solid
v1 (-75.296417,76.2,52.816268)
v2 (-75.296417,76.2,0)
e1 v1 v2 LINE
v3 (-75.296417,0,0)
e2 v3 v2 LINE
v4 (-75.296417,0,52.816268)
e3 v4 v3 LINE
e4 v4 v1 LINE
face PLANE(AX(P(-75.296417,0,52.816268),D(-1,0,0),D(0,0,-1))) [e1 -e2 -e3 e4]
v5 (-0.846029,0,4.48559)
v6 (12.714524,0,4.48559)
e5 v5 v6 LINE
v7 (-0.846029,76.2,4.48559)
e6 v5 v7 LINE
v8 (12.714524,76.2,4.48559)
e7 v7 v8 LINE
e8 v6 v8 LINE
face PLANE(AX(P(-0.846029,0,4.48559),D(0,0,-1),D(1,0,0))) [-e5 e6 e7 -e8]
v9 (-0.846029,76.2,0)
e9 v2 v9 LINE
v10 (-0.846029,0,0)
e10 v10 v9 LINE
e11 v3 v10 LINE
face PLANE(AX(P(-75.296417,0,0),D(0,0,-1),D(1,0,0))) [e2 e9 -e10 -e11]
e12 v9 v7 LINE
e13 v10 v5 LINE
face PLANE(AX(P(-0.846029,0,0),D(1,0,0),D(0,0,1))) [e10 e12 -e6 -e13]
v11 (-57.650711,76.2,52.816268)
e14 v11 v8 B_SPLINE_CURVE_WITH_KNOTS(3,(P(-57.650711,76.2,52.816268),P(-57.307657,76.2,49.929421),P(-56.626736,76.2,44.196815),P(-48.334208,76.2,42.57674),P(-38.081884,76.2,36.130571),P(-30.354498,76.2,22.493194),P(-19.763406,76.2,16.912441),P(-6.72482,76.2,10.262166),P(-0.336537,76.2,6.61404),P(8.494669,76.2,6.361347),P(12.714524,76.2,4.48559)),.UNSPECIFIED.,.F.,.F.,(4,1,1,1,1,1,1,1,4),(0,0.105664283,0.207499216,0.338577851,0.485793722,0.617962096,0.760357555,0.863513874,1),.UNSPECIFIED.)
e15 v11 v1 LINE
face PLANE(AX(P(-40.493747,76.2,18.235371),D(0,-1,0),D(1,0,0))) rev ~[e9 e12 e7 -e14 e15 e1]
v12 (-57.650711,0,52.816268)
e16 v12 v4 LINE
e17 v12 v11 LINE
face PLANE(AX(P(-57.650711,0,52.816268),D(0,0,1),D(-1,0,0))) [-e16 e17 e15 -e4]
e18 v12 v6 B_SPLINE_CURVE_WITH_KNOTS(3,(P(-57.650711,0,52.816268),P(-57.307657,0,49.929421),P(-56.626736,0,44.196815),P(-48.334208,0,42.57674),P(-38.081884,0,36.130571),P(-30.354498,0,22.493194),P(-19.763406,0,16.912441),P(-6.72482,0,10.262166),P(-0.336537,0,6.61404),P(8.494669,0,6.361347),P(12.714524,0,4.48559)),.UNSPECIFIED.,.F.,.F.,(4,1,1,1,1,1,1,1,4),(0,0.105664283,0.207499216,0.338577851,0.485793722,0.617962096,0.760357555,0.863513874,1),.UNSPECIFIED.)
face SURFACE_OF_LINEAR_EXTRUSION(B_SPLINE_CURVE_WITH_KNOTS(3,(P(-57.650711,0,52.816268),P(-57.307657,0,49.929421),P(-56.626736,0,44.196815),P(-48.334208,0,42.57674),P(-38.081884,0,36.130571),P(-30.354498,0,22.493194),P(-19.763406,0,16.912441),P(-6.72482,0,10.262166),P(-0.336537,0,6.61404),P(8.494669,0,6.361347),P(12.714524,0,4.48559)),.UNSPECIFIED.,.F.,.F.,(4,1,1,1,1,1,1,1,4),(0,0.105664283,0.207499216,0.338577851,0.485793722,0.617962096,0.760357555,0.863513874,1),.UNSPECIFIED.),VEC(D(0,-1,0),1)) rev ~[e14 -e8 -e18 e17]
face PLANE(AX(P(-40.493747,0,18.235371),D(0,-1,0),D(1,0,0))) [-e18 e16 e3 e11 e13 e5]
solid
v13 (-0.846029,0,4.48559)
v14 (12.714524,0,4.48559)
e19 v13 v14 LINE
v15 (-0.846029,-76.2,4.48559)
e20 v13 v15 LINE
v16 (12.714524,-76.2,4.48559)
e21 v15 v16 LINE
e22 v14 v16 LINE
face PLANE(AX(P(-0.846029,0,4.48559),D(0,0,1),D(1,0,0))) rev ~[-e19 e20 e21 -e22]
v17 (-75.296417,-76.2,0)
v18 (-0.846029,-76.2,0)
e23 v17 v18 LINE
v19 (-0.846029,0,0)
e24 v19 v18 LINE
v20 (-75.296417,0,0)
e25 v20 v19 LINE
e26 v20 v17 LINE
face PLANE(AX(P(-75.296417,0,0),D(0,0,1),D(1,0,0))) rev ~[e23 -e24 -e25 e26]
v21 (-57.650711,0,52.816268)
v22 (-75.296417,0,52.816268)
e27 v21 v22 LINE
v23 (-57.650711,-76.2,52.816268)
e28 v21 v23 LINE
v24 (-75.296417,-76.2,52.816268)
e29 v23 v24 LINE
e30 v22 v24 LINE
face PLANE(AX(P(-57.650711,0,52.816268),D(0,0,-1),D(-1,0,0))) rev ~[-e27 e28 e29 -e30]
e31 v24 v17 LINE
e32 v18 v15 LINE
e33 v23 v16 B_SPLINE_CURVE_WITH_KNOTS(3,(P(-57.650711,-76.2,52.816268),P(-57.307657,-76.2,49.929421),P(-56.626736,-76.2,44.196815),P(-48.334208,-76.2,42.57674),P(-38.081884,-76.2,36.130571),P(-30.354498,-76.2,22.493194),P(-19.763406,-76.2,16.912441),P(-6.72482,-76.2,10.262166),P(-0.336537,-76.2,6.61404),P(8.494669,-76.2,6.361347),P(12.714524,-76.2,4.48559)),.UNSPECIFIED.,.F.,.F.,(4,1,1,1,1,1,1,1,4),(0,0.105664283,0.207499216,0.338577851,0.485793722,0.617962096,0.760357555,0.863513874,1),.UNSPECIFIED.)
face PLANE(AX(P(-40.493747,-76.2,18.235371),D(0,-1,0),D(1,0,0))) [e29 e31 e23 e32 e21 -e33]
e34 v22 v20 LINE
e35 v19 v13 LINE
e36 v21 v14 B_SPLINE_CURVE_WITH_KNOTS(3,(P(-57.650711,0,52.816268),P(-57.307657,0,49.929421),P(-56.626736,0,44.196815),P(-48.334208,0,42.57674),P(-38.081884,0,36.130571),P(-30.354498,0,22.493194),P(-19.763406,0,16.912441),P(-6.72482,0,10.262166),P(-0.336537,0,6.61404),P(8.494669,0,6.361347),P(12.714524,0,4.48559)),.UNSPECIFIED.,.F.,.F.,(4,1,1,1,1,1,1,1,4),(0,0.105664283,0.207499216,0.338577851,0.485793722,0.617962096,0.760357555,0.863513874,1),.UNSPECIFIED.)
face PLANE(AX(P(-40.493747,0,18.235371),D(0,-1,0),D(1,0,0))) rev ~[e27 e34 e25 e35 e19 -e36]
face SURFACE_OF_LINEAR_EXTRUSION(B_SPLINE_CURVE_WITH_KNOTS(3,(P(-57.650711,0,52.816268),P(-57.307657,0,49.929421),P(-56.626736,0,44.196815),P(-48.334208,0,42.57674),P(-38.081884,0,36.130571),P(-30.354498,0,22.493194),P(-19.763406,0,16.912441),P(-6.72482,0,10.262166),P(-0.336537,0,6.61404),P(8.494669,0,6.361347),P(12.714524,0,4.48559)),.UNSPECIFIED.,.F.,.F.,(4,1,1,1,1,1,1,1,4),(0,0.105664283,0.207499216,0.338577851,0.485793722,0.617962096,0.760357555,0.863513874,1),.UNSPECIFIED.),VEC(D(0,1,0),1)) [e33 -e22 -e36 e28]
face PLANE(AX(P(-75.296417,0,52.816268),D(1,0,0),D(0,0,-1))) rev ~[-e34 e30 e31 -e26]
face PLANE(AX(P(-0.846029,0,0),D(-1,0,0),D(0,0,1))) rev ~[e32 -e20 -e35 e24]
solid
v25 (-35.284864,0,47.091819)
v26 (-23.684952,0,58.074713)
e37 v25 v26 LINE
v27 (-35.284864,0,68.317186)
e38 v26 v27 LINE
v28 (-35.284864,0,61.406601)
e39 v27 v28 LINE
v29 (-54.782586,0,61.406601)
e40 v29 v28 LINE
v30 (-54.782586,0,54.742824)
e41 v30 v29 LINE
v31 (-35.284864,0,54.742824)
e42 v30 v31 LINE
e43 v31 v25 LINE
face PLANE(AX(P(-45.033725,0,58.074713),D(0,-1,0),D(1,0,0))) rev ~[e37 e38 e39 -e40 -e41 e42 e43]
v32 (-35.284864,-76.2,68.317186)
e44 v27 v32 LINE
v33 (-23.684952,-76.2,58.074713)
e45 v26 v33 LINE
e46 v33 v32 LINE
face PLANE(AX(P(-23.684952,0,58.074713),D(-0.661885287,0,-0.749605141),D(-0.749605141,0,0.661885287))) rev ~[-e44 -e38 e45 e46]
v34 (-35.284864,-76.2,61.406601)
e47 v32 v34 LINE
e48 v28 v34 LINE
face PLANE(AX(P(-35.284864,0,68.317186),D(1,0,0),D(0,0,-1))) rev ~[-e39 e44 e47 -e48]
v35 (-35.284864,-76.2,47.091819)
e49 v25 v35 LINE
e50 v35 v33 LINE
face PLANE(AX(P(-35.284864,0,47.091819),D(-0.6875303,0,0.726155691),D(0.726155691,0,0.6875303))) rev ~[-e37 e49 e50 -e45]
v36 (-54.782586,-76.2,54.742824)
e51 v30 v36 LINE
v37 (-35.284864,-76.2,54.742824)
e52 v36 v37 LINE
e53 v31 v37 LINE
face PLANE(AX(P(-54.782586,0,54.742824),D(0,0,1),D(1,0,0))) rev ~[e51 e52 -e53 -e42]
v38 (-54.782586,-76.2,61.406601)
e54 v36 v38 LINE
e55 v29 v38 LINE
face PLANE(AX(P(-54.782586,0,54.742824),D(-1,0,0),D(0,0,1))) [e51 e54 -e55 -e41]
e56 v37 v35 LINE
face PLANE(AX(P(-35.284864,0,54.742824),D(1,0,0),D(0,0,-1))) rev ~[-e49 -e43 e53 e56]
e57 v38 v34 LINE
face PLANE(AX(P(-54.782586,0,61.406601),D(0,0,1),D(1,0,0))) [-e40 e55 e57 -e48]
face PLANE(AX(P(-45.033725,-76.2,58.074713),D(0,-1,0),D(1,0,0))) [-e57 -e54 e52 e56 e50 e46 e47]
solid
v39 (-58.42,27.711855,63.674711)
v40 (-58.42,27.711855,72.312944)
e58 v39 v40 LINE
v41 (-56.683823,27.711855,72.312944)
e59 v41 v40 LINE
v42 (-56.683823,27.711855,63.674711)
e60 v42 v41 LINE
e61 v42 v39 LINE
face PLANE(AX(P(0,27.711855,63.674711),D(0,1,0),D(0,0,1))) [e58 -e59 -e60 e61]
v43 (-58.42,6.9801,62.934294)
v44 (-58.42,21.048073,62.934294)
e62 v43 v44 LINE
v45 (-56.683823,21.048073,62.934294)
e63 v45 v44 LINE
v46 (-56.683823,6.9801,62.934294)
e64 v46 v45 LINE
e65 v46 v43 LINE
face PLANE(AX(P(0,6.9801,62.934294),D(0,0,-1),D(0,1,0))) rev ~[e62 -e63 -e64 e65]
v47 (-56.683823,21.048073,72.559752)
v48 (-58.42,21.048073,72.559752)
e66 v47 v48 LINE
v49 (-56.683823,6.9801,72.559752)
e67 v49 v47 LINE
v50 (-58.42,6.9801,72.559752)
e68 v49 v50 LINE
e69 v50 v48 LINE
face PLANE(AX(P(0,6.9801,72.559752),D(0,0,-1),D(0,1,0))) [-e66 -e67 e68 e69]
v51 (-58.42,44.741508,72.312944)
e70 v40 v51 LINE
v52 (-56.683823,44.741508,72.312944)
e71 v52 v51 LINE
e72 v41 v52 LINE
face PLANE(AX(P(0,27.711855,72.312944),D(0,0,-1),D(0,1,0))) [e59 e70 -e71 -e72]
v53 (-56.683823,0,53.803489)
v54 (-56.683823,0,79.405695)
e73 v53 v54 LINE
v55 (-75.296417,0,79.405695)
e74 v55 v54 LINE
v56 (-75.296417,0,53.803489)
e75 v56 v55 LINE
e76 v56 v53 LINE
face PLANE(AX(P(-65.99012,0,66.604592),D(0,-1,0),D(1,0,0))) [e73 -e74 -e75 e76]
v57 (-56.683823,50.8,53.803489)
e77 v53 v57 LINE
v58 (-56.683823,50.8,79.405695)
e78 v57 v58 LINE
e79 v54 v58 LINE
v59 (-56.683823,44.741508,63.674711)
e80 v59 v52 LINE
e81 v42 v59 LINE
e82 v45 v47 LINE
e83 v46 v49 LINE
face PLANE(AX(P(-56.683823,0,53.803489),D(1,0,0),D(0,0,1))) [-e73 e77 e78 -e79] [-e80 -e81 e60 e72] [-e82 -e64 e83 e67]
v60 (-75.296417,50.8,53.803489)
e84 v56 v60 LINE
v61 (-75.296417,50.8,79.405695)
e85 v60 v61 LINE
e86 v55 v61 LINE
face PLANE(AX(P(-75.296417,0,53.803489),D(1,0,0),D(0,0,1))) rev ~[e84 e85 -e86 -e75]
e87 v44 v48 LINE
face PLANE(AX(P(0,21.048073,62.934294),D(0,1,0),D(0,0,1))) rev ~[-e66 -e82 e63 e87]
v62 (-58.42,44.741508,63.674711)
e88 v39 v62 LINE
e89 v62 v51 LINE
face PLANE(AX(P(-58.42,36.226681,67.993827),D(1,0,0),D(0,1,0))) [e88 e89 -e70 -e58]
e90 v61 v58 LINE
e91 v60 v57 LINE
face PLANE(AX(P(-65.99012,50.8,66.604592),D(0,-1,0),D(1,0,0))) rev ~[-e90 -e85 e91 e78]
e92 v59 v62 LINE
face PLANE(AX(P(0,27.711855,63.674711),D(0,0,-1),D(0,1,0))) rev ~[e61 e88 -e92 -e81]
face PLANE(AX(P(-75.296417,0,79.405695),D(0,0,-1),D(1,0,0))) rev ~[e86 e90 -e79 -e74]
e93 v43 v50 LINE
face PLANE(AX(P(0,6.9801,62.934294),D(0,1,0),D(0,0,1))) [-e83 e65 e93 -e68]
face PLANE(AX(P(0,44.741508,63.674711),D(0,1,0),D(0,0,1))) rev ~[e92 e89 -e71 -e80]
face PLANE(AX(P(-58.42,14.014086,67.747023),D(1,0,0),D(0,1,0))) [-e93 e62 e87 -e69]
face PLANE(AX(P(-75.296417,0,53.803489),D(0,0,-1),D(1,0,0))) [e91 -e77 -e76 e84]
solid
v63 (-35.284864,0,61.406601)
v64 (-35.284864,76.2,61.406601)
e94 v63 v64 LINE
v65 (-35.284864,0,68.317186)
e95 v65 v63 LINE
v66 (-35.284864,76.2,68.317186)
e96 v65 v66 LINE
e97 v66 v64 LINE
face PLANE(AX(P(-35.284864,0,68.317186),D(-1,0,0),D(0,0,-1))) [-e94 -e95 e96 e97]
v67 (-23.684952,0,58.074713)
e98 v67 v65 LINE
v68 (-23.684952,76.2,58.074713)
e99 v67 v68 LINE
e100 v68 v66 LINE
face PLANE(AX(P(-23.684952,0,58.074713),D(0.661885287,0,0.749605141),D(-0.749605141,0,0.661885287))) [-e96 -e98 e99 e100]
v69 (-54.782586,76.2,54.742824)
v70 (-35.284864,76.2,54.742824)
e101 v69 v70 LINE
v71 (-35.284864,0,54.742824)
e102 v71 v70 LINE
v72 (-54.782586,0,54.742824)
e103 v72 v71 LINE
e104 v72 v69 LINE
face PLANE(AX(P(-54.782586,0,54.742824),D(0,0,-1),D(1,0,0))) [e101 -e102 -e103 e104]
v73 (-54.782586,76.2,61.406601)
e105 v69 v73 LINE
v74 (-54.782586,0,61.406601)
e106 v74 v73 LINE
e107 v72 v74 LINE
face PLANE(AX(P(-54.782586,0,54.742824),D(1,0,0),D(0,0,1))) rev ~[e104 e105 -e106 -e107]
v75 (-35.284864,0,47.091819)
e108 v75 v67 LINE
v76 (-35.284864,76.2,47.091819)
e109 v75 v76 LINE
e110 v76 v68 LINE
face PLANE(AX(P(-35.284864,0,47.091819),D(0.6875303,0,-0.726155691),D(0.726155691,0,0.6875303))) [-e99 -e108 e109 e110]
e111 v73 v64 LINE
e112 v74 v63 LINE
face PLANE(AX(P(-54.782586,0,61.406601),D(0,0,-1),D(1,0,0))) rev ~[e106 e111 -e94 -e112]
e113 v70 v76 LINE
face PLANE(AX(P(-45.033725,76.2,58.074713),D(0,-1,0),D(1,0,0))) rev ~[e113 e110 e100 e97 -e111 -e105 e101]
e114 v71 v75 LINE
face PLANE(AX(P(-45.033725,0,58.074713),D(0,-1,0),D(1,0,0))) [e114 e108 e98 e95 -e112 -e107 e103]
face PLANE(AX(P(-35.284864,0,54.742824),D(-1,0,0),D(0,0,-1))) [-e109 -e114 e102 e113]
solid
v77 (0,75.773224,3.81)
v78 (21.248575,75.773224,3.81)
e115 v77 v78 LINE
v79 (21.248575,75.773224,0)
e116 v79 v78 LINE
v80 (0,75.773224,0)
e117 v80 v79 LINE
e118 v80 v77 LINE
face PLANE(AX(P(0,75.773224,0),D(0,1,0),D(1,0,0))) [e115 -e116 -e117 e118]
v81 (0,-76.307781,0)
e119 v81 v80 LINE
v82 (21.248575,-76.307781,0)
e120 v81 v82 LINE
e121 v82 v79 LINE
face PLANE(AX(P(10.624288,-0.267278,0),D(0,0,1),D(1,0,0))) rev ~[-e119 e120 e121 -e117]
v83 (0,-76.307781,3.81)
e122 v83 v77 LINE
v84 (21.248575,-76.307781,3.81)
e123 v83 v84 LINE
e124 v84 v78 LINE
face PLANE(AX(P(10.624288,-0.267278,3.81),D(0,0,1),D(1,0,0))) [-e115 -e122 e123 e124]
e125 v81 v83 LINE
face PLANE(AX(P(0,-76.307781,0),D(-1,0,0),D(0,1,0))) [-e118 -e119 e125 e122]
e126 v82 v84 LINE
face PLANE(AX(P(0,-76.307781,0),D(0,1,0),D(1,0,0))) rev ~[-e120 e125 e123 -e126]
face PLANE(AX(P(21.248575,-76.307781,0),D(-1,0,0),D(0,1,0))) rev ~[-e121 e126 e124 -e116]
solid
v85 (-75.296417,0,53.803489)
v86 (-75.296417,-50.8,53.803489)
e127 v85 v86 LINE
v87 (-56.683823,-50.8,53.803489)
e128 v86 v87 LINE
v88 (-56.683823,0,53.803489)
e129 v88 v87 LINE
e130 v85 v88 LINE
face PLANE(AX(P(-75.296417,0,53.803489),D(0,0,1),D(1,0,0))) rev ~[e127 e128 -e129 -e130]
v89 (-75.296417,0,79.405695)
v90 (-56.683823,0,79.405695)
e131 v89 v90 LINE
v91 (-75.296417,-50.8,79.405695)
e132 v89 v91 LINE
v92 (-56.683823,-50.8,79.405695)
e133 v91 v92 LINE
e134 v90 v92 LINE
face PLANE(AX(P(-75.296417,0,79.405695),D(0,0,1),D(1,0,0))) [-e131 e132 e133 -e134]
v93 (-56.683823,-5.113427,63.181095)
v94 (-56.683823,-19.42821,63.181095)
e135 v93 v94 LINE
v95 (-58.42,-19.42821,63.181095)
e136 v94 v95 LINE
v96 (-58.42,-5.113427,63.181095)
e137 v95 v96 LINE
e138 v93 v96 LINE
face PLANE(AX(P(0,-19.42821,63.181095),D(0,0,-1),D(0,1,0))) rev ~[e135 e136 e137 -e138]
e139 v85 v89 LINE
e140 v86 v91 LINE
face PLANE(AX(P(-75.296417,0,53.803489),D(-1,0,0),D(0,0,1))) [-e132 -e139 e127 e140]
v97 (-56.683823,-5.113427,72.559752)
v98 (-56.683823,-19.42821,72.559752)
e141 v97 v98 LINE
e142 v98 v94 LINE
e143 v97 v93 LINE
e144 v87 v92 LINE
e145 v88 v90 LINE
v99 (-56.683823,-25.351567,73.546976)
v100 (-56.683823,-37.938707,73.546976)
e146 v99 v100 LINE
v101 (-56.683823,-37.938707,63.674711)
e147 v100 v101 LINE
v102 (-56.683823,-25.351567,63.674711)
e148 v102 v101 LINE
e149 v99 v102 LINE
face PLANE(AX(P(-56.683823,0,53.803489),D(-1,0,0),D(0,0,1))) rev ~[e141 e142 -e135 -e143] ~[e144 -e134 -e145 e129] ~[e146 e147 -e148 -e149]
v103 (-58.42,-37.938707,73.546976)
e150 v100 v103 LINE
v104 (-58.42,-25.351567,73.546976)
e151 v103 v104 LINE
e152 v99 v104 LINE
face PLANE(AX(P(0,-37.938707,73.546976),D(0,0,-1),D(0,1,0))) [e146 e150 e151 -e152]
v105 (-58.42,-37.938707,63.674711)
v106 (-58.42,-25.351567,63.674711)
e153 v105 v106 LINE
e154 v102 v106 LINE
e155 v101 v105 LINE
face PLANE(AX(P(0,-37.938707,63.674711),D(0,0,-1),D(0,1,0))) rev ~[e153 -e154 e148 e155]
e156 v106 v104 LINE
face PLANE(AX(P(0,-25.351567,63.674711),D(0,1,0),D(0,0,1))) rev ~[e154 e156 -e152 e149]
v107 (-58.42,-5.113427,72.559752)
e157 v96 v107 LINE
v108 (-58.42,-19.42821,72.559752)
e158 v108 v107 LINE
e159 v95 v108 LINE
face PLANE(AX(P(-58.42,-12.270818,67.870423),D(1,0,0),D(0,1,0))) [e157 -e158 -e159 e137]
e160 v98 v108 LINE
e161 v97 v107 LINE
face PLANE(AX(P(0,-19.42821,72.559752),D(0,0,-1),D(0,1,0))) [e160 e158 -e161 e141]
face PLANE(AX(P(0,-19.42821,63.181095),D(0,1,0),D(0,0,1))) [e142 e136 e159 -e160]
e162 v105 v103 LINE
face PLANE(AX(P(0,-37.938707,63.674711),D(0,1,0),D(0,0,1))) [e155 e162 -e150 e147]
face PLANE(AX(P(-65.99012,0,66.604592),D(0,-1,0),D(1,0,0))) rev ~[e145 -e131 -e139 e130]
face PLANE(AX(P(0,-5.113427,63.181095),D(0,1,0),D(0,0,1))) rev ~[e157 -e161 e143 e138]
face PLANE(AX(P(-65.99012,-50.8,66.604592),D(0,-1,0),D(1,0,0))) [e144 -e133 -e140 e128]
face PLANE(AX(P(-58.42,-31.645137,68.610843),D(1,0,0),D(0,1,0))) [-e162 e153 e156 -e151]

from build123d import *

# Parameters (mm, degrees)
F0_W     = 21.2485753
F0_H     = 152.0810052752
F1_DEPTH = 3.81
F3_DEPTH = 76.2
F2_W     = 19.4977223873
F2_H     = 6.6637769341
F4_DEPTH = 76.2
F5_W     = 18.6125934124
F5_H     = 25.6022065878
F6_DEPTH = 50.8
F7_DEPTH = 50.8
F8_W     = 14.3147837371
F8_H     = 9.378656745
F8_W_2   = 14.0679730102
F8_H_2   = 9.6254572272
F8_W_3   = 12.587139383
F8_H_3   = 9.8722651601
F8_W_4   = 17.029652372
F8_H_4   = 8.6382329464
F9_DEPTH = 58.42


with BuildPart() as f1:
    # F0 (on Top) → F1 (new body)
    with BuildSketch(Plane.XY):
        with Locations((10.62428765, -0.267278403)):
            Rectangle(F0_W, F0_H)
    extrude(amount=F1_DEPTH)


with BuildPart() as f3:
    # F2 (on Front) → F3 (new body)
    with BuildSketch(Plane.XZ):
        with BuildLine():
            Line((-57.6507113874, 52.8162680566), (-75.2964168787, 52.8162680566))
            Line((-75.2964168787, 52.8162680566), (-75.2964168787, 0))
            Line((-75.2964168787, 0), (-0.846029463, 0))
            Line((-0.846029463, 0), (-0.846029463, 4.4855900342))
            Line((-0.846029463, 4.4855900342), (0, 4.4855900342))
            Line((0, 4.4855900342), (12.7145235892, 4.4855900342))
            add(Edge.make_bspline(
                [(-57.6507113874, 52.8162680566), (-57.3076574479, 49.9294208495), (-56.6267364551, 44.1968150065), (-48.3342084307, 42.576740226), (-38.0818843322, 36.1305714757), (-30.3544979342, 22.4931937459), (-19.7634057619, 16.912441387), (-6.7248199885, 10.2621660981), (-0.3365370443, 6.6140396), (8.4946691957, 6.3613474044), (12.7145235892, 4.4855900342)],
                knots=[0, 0, 0, 0, 0.1056642831, 0.2074992162, 0.338577851, 0.4857937218, 0.6179620961, 0.7603575547, 0.8635138744, 1, 1, 1, 1], degree=3))
        make_face()
    extrude(amount=F3_DEPTH)


with BuildPart() as f3b:
    # F2 (on Front) → F3, piece 2 (new body)
    with BuildSketch(Plane.XZ):
        with Locations((-45.0337249786, 58.0747127533)):
            Rectangle(F2_W, F2_H)
        Polygon((-35.2848637849, 68.3171860874), (-35.2848637849, 61.4066012204), (-35.2848637849, 54.7428242862), (-35.2848637849, 47.091819346), (-23.6849524081, 58.0747127533), align=None)
    extrude(amount=F3_DEPTH)


with BuildPart() as f4:
    # F4 (new): a face of the model
    f4_faces = [f3.part.faces().sort_by_distance(p)[0] for p in [
        (-48.0221712307, 0, 19.9820449464),
    ]]
    extrude(f4_faces, amount=F4_DEPTH)


with BuildPart() as f4b:
    # F4#2 (new): a face of the model
    f4_2_faces = [f3b.part.faces().sort_by_distance(p)[0] for p in [
        (-38.4095254278, 0, 57.954636592),
    ]]
    extrude(f4_2_faces, amount=F4_DEPTH)


with BuildPart() as f6:
    # F5 (on Front) → F6 (new body)
    with BuildSketch(Plane.XZ):
        with Locations((-65.9901201725, 66.6045919061)):
            Rectangle(F5_W, F5_H)
    extrude(amount=F6_DEPTH)


with BuildPart() as f7:
    # F7 (new): a face of the model
    f7_faces = [f6.part.faces().sort_by_distance(p)[0] for p in [
        (-65.9901201725, 0, 66.6045919061),
    ]]
    extrude(f7_faces, amount=F7_DEPTH)


with BuildPart() as f9_tool:
    # F8 (on Right) → F9 (new body)
    with BuildSketch(Plane.YZ):
        with Locations((-12.2708184645, 67.8704231977)):
            Rectangle(F8_W, F8_H)
        with Locations((14.0140862204, 67.7470229566)):
            Rectangle(F8_W_2, F8_H_2)
        with Locations((-31.6451368853, 68.610843271)):
            Rectangle(F8_W_3, F8_H_3)
        with Locations((36.2266814336, 67.9938271642)):
            Rectangle(F8_W_4, F8_H_4)
    extrude(amount=-F9_DEPTH)


with BuildPart() as f6_1:
    add(f6.part)

    # F9: cut by f9_tool
    add(f9_tool.part, mode=Mode.SUBTRACT)


with BuildPart() as f7_1:
    add(f7.part)

    # F9: cut by f9_tool
    add(f9_tool.part, mode=Mode.SUBTRACT)


solid = Compound([f1.part, f3.part, f3b.part, f4.part, f4b.part, f6_1.part, f7_1.part])
